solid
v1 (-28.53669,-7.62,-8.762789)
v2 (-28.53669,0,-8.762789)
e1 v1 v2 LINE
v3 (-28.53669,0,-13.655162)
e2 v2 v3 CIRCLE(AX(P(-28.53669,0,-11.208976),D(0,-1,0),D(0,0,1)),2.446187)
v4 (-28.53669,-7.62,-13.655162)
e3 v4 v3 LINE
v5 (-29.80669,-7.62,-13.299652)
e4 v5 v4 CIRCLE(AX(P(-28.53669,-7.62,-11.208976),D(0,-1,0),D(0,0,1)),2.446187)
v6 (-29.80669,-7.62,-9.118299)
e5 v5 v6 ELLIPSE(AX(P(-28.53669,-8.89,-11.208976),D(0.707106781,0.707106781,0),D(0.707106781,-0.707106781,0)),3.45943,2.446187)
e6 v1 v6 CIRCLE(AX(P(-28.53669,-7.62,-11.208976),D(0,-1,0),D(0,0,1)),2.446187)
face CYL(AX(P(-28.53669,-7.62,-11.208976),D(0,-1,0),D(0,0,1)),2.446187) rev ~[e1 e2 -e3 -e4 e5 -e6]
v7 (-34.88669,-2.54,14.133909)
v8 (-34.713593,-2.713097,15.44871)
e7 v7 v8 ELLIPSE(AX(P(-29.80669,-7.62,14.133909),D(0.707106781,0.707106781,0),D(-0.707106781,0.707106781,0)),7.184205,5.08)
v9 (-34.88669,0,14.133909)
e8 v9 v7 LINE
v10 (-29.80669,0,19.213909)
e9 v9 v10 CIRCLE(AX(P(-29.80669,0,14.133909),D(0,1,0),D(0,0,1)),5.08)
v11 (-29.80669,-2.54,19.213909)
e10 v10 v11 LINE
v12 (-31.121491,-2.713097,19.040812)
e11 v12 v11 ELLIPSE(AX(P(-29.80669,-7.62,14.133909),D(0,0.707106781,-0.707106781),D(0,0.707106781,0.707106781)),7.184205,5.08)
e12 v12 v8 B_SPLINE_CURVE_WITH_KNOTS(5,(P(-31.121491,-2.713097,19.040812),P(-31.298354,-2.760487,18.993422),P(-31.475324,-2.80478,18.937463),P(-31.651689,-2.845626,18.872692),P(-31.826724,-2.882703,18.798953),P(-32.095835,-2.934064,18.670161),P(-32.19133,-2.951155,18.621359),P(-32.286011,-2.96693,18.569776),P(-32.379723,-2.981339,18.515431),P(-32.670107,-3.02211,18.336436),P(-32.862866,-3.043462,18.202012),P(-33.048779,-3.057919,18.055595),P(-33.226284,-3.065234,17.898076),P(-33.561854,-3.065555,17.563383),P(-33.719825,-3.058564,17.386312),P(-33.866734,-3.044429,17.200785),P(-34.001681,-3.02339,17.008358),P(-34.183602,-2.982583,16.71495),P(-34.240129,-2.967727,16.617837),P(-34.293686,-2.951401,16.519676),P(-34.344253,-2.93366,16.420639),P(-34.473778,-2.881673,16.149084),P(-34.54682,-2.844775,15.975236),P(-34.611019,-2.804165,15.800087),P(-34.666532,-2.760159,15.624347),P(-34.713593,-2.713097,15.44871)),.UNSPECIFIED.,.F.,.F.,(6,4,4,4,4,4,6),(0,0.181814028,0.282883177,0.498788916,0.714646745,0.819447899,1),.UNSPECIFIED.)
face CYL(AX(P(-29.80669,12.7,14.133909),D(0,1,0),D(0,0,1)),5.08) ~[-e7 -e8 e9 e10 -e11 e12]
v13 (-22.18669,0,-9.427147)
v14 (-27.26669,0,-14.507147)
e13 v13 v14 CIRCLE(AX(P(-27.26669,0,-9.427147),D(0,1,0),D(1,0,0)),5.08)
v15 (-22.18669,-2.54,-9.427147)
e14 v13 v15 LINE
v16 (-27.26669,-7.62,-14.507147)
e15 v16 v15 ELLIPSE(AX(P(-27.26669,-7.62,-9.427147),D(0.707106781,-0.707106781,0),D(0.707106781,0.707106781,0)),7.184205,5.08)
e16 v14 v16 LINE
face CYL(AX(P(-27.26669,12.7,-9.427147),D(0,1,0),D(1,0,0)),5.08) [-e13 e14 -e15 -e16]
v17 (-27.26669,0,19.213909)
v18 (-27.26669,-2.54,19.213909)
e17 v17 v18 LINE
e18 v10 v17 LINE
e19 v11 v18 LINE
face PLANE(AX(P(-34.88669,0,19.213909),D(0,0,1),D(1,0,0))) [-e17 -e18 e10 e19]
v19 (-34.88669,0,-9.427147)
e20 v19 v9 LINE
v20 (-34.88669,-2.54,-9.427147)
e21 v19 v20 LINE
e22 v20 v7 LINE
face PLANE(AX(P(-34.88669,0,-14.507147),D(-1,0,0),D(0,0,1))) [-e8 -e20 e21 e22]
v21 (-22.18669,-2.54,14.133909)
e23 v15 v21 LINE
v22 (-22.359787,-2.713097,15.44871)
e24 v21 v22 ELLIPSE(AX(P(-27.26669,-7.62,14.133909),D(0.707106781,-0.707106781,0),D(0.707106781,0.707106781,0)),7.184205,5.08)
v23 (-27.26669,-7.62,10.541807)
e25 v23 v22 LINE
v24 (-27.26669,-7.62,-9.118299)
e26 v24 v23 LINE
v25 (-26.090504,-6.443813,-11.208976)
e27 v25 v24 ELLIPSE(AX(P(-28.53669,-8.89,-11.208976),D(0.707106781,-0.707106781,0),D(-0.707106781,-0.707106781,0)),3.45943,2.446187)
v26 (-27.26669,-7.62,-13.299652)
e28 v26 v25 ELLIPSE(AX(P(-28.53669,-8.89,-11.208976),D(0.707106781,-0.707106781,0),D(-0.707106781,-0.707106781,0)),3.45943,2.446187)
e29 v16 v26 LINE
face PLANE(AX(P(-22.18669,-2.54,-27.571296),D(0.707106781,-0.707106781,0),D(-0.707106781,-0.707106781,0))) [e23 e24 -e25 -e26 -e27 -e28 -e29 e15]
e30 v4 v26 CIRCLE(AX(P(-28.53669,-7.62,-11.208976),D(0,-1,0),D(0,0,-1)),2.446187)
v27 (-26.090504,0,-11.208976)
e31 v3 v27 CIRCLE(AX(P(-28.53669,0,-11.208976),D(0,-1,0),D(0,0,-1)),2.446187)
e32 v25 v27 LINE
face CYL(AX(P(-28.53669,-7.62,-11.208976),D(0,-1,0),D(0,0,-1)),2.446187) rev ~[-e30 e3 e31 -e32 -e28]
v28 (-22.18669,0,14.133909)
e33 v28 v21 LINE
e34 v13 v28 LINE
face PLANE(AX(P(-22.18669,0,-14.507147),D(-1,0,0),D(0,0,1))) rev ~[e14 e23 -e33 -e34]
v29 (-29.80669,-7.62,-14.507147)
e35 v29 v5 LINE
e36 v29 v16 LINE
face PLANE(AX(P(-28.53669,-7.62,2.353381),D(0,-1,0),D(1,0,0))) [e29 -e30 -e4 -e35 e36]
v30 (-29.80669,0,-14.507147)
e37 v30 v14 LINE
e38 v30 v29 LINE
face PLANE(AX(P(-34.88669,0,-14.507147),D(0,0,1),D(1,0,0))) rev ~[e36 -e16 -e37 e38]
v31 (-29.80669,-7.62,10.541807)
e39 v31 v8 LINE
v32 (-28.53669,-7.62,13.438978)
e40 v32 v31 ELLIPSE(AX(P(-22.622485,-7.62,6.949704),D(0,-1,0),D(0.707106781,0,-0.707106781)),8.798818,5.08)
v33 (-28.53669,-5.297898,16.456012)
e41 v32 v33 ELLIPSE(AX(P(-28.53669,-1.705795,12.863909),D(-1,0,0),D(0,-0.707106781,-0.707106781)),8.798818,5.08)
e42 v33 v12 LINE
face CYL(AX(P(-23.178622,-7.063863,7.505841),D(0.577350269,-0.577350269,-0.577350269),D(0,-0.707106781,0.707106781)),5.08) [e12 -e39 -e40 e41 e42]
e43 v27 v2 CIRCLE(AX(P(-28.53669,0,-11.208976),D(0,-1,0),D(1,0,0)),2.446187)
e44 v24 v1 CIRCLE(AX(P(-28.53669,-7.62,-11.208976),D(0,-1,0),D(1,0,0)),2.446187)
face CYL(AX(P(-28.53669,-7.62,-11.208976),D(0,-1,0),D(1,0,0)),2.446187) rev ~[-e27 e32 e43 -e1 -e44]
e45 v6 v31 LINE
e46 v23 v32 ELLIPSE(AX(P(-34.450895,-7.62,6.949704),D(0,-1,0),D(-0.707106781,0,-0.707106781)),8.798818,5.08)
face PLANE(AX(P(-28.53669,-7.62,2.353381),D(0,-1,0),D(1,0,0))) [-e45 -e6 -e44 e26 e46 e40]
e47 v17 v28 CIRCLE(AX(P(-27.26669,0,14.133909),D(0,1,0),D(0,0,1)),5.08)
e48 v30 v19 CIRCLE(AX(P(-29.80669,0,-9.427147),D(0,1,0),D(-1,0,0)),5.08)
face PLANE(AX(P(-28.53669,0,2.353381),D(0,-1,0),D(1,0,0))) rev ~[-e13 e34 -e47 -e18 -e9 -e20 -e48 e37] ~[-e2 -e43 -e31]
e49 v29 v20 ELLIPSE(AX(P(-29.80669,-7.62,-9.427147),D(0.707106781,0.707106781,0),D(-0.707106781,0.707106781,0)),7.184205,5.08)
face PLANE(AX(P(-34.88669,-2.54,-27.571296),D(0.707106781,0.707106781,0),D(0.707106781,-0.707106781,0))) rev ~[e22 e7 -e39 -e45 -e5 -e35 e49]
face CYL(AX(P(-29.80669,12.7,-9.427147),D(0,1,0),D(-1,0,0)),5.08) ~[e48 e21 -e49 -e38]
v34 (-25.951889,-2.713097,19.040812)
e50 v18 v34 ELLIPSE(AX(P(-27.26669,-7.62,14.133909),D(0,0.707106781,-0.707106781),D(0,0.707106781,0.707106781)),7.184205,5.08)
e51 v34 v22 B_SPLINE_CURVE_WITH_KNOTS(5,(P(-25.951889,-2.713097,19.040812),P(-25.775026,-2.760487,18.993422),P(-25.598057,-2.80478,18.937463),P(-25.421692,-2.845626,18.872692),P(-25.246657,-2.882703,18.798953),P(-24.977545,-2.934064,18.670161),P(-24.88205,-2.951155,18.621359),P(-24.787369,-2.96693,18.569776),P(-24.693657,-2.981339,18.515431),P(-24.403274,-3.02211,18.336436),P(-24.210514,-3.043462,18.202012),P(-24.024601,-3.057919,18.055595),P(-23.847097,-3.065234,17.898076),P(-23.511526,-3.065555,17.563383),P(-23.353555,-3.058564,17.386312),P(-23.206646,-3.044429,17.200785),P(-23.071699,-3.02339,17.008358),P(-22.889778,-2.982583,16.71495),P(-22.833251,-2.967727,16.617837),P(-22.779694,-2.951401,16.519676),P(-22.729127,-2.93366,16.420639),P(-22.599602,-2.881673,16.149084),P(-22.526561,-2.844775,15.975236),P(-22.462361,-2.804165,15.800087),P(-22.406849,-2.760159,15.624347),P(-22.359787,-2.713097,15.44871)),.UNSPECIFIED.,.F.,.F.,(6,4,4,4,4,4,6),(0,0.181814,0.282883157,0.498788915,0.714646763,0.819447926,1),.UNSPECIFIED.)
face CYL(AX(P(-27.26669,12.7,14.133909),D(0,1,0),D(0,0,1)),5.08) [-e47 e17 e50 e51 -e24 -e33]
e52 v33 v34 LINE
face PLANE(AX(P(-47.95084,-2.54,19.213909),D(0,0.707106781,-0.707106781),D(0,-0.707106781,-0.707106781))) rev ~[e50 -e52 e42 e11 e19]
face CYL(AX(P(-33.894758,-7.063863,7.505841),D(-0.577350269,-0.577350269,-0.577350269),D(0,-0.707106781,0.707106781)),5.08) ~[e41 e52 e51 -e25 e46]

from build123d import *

# Parameters (mm, degrees)
F0_W        = 12.7
F0_H        = 33.7210557661
F1_DEPTH    = 7.62
F3_DEPTH    = 25.4
F4_T1_DEPTH = 59.8493549238
F4_T3_DEPTH = 38.8282991577
F5_T1_DEPTH = 27.94
F5_T3_DEPTH = 23.4635149399
F5_T5_DEPTH = 23.4635149399


# Not quite as in the source:
# - a fillet or chamfer that OpenCascade refuses, or shapes differently, is made with other operations: its cross-section is extruded or revolved along the edge and cut away or added


with BuildPart() as f1:
    # F0 (on Front) → F1 (new body)
    with BuildSketch(Plane.XZ):
        with Locations((-28.5366901662, 2.3533813655)):
            Rectangle(F0_W, F0_H)
    extrude(amount=F1_DEPTH)

    # F2 (on face) → F3 (cut)
    with BuildSketch(Plane.XZ.offset(7.62)):
        with BuildLine():
            ThreePointArc((-28.5366901662, -8.7627890215), (-30.9828768324, -11.2089756876), (-28.5366901662, -13.6551623538))
            Line((-28.5366901662, -13.6551623538), (-28.5366901662, -8.7627890215))
        make_face()
        with BuildLine():
            Line((-28.5366901662, -8.7627890215), (-28.5366901662, -13.6551623538))
            ThreePointArc((-28.5366901662, -13.6551623538), (-26.8069749865, -12.9386908673), (-26.0905035001, -11.2089756876))
            ThreePointArc((-26.0905035001, -11.2089756876), (-26.8069749865, -9.4792605079), (-28.5366901662, -8.7627890215))
        make_face()
    extrude(amount=-F3_DEPTH, mode=Mode.SUBTRACT)

    # F4: chamfer of 5.08 on 3 edges, made by hand

    # F4_s2 → F4_t1 (cut)
    with BuildSketch(Plane.XY.offset(-27.5712960964)):
        Polygon((-22.1866901662, -2.54), (-27.2666901662, -7.62), (-22.1866901662, -7.62), align=None)
        Polygon((-34.8866901662, -2.54), (-29.8066901662, -7.62), (-34.8866901662, -7.62), align=None)
    extrude(amount=F4_T1_DEPTH, mode=Mode.SUBTRACT)

    # F4_s4 → F4_t3 (cut)
    with BuildSketch(Plane.YZ.offset(-47.9508397451)):
        Polygon((-2.54, 19.2139092486), (-7.62, 14.1339092486), (-7.62, 19.2139092486), align=None)
    extrude(amount=F4_T3_DEPTH, mode=Mode.SUBTRACT)

    # F5: fillet of radius 5.08 on 6 edges, made by hand

    # F5_s2 → F5_t1 (cut)
    with BuildSketch(Plane.XZ.offset(-12.7)):
        with BuildLine():
            ThreePointArc((-29.8066901662, 19.2139092486), (-33.3987926146, 17.726011697), (-34.8866901662, 14.1339092486))
            Line((-34.8866901662, 14.1339092486), (-34.8866901662, 19.2139092486))
            Line((-34.8866901662, 19.2139092486), (-29.8066901662, 19.2139092486))
        make_face()
        with BuildLine():
            ThreePointArc((-27.2666901662, 19.2139092486), (-23.6745877178, 17.726011697), (-22.1866901662, 14.1339092486))
            Line((-22.1866901662, 14.1339092486), (-22.1866901662, 19.2139092486))
            Line((-22.1866901662, 19.2139092486), (-27.2666901662, 19.2139092486))
        make_face()
        with BuildLine():
            ThreePointArc((-22.1866901662, -9.4271465175), (-23.6745877178, -13.0192489659), (-27.2666901662, -14.5071465175))
            Line((-27.2666901662, -14.5071465175), (-22.1866901662, -14.5071465175))
            Line((-22.1866901662, -14.5071465175), (-22.1866901662, -9.4271465175))
        make_face()
        with BuildLine():
            ThreePointArc((-34.8866901662, -9.4271465175), (-33.3987926146, -13.0192489659), (-29.8066901662, -14.5071465175))
            Line((-29.8066901662, -14.5071465175), (-34.8866901662, -14.5071465175))
            Line((-34.8866901662, -14.5071465175), (-34.8866901662, -9.4271465175))
        make_face()
    extrude(amount=F5_T1_DEPTH, mode=Mode.SUBTRACT)

    # F5_s4 → F5_t3 (cut)
    with BuildSketch(Plane(origin=(-11.1509269725, -11.1509269725, -11.1509269725), x_dir=(-0.7071067812, 0.7071067812, 0), z_dir=(0.5773502692, 0.5773502692, 0.5773502692))):
        with BuildLine():
            ThreePointArc((16.4323078444, 27.2491898807), (14.5728987932, 25.3897808294), (13.8923078444, 22.8497808294))
            Line((13.8923078444, 22.8497808294), (13.8923078444, 25.7827201969))
            Line((13.8923078444, 25.7827201969), (16.4323078444, 27.2491898807))
        make_face()
    extrude(amount=F5_T3_DEPTH, mode=Mode.SUBTRACT)

    # F5_s6 → F5_t5 (cut)
    with BuildSketch(Plane(origin=(-7.8735331383, 7.8735331383, 7.8735331383), x_dir=(-0.7071067812, -0.7071067812, 0), z_dir=(-0.5773502692, 0.5773502692, 0.5773502692))):
        with BuildLine():
            ThreePointArc((23.9246664139, 3.949079929), (25.7840754651, 2.0896708777), (26.4646664139, -0.4503291223))
            Line((26.4646664139, -0.4503291223), (26.4646664139, 2.4826102452))
            Line((26.4646664139, 2.4826102452), (23.9246664139, 3.949079929))
        make_face()
    extrude(amount=F5_T5_DEPTH, mode=Mode.SUBTRACT)


solid = f1.part
